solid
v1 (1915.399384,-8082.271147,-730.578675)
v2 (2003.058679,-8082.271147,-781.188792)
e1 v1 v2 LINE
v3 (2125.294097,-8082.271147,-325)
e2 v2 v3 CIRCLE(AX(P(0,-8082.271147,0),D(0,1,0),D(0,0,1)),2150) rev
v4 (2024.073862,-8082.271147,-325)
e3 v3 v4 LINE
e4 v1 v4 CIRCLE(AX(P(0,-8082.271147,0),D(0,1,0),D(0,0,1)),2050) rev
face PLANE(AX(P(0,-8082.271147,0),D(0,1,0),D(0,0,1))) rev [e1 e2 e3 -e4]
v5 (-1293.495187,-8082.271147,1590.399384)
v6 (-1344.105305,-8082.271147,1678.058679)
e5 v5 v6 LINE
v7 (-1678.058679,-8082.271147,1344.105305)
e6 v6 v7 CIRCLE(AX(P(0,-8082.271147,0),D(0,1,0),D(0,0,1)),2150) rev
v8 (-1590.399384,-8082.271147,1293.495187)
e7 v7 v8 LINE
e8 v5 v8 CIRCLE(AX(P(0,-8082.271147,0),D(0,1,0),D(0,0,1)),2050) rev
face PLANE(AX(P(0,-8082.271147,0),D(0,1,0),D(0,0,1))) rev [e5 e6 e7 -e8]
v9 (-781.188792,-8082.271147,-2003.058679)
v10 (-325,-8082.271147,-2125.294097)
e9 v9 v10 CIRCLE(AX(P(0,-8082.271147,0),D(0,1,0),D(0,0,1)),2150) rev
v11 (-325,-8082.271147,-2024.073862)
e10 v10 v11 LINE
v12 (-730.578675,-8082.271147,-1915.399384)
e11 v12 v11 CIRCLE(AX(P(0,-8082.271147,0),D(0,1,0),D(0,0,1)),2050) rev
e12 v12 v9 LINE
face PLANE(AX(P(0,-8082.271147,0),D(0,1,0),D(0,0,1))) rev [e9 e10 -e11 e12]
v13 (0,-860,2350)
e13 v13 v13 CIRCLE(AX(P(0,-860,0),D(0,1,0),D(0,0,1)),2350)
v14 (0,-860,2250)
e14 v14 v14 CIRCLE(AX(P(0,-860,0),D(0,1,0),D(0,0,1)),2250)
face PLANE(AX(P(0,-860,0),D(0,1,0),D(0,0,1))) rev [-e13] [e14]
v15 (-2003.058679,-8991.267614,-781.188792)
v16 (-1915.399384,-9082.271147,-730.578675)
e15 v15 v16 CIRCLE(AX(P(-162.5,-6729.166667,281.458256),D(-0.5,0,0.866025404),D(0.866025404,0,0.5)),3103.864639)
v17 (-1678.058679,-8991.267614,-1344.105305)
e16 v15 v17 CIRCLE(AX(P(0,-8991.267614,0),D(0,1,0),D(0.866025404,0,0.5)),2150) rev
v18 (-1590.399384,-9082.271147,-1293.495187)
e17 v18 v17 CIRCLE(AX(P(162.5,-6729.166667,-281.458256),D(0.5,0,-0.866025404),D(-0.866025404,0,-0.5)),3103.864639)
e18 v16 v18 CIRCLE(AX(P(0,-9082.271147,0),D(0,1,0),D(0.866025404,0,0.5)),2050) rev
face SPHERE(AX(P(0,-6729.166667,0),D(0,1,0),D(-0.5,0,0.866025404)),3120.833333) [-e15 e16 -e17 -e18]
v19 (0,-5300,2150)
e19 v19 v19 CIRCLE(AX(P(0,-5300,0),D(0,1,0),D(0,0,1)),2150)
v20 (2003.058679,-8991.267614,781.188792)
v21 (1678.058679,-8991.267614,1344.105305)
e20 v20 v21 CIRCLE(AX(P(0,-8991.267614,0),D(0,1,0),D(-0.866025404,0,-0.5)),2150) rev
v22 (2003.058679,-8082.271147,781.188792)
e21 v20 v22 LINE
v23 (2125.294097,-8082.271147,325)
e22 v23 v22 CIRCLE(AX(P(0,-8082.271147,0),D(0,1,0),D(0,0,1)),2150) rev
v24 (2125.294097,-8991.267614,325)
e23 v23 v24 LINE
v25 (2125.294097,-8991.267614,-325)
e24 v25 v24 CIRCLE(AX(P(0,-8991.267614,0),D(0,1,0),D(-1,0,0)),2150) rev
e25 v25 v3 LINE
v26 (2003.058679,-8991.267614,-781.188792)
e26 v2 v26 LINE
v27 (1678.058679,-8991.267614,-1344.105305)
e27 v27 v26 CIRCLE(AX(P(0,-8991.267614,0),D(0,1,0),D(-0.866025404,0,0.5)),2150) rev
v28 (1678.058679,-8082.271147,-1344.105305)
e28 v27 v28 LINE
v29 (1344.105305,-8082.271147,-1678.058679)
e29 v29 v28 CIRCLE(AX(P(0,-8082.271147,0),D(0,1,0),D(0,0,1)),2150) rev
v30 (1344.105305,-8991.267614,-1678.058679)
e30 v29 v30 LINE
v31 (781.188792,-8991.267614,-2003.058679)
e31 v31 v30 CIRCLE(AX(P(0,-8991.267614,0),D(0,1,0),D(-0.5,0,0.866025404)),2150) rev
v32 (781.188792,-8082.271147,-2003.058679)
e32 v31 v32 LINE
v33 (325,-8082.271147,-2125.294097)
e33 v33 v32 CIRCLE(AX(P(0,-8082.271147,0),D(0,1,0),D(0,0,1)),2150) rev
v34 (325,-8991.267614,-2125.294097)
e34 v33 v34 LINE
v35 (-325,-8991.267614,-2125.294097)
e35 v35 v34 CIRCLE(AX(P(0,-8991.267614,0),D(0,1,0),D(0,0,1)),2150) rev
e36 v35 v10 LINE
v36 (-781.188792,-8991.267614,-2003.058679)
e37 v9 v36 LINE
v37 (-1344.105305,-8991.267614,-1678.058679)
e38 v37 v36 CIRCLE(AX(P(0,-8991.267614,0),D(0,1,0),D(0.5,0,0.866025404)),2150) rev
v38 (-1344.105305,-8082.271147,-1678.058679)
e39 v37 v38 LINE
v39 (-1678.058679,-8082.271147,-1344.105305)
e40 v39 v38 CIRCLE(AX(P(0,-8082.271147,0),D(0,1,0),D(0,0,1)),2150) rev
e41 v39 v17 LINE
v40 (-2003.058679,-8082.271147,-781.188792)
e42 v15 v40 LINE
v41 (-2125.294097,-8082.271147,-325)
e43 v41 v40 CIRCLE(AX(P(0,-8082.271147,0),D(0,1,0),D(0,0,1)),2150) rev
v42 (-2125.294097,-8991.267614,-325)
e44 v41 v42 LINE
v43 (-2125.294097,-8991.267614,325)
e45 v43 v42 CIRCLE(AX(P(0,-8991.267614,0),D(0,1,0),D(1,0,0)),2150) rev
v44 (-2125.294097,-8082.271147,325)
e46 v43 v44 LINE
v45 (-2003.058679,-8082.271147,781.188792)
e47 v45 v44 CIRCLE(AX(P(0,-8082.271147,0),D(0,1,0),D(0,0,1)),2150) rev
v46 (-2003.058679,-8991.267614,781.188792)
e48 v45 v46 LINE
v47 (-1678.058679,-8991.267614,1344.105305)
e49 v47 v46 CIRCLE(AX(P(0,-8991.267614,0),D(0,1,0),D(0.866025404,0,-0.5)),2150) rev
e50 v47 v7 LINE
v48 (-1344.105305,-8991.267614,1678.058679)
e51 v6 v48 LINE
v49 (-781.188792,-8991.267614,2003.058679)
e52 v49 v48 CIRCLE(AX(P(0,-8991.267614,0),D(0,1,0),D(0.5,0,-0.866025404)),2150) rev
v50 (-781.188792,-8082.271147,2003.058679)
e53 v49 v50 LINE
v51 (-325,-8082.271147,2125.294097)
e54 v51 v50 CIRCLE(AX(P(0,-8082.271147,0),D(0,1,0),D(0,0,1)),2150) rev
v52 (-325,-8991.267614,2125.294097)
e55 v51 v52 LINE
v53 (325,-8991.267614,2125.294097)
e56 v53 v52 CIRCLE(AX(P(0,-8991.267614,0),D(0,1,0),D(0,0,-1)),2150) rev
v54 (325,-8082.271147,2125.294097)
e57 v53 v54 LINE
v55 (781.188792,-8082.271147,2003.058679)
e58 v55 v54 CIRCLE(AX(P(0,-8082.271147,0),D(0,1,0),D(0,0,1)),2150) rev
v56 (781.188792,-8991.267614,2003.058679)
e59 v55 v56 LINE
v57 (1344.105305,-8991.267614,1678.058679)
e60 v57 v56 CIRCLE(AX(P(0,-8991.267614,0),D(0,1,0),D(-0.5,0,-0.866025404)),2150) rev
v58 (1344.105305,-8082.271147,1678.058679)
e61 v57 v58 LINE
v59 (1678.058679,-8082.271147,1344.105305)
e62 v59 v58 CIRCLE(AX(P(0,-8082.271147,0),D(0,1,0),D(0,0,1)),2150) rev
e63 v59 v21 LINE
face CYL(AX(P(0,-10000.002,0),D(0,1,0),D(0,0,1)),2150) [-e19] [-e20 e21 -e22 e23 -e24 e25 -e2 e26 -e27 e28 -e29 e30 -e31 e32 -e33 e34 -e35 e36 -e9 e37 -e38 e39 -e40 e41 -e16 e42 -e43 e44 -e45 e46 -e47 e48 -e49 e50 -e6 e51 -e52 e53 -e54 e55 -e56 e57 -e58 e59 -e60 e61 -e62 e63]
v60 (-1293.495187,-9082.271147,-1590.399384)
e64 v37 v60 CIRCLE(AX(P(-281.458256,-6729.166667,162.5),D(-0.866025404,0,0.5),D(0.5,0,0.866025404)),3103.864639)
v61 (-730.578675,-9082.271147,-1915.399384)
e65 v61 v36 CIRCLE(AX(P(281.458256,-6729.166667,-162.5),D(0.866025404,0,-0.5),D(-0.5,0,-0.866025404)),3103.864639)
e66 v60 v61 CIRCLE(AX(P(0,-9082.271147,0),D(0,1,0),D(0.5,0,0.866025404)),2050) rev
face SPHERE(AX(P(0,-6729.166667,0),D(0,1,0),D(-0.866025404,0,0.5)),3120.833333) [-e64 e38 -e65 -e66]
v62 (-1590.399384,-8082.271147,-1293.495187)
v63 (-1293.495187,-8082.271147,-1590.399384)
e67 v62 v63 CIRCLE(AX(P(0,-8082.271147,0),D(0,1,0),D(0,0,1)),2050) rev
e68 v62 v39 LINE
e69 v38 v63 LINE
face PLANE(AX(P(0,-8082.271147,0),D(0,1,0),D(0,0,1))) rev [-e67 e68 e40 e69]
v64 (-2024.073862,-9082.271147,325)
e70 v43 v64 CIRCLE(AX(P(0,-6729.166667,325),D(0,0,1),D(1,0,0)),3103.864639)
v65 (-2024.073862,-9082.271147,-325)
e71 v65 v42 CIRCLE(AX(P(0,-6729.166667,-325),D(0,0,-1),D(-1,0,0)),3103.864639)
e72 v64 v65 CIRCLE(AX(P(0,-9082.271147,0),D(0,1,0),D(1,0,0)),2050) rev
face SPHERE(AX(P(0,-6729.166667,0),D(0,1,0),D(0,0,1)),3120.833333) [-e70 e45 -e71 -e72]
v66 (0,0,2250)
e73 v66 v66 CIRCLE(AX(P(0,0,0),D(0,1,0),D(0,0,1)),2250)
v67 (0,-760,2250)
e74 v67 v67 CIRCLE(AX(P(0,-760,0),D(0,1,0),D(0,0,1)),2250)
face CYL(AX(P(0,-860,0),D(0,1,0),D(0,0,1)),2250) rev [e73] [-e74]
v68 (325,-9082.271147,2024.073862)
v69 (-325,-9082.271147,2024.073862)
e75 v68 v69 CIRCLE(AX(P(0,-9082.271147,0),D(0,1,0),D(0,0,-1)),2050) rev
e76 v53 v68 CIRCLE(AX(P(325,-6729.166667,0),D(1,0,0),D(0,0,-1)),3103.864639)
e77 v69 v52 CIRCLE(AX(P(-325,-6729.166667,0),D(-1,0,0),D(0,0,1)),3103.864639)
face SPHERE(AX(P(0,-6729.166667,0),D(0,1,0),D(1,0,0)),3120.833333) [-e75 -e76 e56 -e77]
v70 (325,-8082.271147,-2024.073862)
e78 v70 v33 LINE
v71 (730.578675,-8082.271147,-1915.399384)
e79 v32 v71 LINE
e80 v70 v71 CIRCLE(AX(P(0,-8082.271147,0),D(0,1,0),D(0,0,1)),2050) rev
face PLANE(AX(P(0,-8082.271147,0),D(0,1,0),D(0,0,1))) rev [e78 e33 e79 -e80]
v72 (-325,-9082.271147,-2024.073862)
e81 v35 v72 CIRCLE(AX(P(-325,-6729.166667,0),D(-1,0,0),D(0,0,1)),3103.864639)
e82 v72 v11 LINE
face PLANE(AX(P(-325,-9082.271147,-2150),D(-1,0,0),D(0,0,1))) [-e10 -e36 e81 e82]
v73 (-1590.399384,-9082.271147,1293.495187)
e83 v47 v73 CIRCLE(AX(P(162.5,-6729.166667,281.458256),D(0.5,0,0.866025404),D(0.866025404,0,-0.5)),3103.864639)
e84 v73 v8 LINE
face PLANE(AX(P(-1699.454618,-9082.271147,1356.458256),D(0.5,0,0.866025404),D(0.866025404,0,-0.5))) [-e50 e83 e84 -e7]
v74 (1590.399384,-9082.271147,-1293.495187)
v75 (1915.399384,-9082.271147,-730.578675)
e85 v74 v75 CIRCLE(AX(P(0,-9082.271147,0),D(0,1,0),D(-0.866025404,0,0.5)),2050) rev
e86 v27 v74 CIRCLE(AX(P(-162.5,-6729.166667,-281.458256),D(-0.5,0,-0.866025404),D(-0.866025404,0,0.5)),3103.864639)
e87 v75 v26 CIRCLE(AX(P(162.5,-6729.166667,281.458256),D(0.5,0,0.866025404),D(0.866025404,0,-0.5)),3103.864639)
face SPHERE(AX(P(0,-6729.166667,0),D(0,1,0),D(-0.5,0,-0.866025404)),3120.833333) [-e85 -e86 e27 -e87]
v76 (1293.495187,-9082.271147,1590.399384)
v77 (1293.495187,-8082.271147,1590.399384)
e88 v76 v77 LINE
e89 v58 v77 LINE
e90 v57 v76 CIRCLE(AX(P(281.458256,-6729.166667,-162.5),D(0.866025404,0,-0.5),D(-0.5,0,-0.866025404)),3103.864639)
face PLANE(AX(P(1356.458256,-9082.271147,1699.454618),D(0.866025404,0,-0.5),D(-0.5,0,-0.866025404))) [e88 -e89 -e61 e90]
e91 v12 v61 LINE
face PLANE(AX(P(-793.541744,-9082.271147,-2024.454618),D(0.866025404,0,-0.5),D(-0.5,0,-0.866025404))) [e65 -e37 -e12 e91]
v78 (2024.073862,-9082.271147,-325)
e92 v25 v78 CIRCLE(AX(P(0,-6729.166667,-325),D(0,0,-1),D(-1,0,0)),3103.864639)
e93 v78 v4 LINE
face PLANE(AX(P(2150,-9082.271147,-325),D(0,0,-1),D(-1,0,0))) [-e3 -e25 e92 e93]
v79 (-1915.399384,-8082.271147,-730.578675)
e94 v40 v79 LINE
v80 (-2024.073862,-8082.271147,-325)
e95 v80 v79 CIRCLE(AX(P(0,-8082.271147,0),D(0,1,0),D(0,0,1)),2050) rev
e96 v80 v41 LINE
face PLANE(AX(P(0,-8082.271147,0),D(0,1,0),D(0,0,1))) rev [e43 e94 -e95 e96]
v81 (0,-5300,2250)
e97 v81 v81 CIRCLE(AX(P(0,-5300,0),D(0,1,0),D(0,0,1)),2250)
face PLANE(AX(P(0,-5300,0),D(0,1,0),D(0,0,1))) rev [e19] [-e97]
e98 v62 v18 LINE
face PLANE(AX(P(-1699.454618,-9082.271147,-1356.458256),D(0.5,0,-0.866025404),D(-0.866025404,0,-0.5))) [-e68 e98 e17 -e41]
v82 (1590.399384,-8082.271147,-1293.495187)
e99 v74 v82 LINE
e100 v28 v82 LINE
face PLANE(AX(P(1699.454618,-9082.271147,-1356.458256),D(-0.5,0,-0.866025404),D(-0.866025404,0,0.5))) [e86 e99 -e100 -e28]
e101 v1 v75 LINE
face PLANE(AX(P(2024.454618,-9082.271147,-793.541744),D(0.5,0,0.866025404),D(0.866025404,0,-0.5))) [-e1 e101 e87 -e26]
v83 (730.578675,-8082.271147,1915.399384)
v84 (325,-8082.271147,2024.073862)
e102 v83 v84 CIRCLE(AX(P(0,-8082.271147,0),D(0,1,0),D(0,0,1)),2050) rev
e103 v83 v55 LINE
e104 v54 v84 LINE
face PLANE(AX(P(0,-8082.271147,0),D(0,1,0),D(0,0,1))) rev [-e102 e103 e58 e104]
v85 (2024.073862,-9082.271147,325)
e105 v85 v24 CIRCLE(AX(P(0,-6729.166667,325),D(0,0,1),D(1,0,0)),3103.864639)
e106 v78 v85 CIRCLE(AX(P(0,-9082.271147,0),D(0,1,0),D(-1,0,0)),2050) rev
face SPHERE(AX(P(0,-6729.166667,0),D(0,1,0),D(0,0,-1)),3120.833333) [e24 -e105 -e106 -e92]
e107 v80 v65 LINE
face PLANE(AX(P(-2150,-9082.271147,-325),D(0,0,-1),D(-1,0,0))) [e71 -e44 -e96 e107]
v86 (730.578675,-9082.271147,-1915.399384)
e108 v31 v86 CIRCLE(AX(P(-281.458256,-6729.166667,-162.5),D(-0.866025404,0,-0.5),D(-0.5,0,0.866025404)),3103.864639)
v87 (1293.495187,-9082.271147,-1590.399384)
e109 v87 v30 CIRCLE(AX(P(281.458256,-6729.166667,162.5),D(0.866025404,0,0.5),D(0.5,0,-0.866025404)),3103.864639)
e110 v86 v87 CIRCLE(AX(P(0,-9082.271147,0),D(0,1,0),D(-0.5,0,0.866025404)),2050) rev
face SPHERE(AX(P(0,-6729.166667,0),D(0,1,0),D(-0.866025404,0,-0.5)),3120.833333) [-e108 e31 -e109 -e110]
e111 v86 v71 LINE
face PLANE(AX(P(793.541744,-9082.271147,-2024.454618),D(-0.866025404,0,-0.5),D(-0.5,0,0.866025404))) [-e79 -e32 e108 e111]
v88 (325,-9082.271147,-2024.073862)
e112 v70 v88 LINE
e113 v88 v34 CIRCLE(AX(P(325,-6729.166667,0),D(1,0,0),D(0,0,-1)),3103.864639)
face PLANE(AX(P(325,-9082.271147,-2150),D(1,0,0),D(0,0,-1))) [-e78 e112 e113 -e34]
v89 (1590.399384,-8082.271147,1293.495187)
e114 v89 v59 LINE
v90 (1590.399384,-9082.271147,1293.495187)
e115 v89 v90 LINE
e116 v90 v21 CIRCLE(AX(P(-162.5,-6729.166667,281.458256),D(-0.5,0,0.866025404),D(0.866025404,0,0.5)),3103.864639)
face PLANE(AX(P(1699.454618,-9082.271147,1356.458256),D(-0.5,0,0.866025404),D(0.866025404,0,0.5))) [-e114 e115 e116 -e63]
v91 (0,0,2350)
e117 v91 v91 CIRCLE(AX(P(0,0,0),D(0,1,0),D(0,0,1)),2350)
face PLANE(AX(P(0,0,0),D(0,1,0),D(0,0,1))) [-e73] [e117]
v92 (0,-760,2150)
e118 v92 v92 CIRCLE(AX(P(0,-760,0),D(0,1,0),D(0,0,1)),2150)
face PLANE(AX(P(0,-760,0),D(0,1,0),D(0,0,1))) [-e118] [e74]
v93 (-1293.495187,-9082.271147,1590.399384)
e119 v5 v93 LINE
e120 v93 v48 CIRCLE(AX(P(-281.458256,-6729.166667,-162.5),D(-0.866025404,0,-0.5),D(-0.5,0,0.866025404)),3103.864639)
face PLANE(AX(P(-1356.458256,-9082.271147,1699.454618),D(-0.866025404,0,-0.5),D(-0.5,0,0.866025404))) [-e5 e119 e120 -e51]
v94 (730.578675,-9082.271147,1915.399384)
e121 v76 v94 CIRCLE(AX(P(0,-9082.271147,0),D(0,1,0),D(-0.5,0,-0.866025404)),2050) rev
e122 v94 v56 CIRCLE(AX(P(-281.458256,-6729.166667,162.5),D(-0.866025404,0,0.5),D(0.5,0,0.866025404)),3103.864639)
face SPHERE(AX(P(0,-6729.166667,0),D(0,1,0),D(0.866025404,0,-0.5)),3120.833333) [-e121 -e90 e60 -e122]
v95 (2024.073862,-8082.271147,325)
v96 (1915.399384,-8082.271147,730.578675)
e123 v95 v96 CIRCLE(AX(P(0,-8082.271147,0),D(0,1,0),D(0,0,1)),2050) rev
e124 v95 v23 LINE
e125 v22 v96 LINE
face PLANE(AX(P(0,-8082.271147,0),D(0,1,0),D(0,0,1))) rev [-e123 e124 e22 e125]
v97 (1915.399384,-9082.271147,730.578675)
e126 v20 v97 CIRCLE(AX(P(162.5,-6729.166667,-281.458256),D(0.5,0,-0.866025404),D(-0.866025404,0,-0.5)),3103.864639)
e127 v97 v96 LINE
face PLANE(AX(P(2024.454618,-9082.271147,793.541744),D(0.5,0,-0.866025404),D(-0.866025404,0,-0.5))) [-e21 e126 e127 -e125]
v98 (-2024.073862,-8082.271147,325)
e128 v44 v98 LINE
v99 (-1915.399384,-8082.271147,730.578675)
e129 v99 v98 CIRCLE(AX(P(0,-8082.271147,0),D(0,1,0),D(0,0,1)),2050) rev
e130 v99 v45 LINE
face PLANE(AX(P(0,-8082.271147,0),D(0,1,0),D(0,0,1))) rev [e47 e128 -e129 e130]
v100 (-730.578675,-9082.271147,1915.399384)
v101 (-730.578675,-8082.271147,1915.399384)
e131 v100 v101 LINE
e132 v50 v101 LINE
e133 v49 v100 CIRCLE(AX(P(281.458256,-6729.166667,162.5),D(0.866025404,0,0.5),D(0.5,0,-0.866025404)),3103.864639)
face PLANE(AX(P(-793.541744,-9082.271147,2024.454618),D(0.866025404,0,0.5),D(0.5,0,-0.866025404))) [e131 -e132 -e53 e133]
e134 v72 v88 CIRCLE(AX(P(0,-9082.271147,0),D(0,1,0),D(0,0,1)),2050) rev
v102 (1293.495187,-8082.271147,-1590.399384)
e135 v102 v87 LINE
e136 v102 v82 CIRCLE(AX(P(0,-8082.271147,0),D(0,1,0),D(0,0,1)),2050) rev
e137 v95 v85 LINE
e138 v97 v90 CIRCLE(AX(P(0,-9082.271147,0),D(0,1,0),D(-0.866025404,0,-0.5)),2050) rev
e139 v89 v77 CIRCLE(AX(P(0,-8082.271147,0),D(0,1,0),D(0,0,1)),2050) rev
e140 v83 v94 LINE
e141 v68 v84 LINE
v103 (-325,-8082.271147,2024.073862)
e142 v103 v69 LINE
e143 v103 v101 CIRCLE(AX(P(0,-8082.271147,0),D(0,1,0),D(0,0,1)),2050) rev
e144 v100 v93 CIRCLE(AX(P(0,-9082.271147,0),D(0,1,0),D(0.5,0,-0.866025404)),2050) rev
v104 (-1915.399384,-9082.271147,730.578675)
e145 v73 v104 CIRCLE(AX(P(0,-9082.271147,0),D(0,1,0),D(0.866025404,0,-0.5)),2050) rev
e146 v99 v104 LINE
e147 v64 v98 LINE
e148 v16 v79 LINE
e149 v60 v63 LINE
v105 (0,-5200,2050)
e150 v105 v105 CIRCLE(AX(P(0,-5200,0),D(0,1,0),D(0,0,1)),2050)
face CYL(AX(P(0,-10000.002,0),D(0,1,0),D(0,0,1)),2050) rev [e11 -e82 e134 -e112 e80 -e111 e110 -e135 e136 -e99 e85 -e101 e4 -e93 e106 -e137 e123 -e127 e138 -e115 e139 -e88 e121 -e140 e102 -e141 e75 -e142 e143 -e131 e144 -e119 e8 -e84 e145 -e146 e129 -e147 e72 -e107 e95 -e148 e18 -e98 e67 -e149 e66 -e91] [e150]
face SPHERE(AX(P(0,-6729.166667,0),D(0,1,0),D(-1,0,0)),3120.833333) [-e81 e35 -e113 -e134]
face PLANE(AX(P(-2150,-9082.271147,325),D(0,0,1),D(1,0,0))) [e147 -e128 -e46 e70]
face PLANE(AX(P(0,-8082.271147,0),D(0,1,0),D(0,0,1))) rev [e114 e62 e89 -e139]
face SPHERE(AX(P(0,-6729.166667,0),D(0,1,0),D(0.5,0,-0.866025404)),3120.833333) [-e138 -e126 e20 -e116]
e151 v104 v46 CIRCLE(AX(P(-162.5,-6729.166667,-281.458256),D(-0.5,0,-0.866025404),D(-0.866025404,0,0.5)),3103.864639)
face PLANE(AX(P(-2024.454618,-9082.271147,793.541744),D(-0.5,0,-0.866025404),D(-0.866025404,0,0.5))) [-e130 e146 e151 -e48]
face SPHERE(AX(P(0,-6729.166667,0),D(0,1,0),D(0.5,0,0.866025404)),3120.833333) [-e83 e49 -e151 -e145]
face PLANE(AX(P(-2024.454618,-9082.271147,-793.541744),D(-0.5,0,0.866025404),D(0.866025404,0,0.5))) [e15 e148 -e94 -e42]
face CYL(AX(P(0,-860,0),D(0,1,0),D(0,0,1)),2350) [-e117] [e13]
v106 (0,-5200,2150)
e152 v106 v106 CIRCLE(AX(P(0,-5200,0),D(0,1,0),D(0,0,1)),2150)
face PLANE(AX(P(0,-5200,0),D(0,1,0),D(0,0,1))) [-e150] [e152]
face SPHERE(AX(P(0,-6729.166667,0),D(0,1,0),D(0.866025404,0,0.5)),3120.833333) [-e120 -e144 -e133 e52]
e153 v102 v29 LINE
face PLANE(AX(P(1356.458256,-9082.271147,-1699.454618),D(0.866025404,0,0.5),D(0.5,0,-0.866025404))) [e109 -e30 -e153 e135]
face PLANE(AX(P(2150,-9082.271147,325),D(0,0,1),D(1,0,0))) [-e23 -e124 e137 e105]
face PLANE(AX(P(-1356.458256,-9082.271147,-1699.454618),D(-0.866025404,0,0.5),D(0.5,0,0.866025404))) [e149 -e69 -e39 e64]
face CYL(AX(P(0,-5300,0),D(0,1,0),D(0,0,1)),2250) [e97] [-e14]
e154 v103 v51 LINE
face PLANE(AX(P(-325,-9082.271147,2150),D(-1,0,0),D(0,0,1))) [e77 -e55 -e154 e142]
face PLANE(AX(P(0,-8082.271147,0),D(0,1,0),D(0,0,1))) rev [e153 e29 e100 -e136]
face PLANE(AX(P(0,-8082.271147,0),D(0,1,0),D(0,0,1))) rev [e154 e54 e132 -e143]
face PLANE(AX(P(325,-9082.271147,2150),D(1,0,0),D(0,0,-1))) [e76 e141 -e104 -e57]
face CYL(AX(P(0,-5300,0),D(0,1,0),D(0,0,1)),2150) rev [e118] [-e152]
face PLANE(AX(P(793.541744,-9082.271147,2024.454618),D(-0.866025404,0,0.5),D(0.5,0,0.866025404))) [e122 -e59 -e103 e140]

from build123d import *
from build123d.topology import SkipClean

# Parameters (mm, degrees)
REVOLVE_1_ANGLE          = 180
SHELL_1_T                = -150
CUT_EXTRUDE_1_DEPTH      = 18660.782956937
EXTRUDE_1_REACH          = 14147.141
EXTRUDE_1_END_RADIUS     = 3120.833333333
SKETCH_3_R               = 2150
SKETCH_3_R_2             = 2050
SKETCH_4_R               = 3482.688790768
SKETCH_4_W               = 650
SKETCH_4_H               = 200
CUT_EXTRUDE_2_DEPTH      = 4190.568828001
PATTERN_CIRCULAR_2_COUNT = 12
EXTRUDE_2_DEPTH          = 4440
EXTRUDE_2_DEPTH_BACK     = 100
SKETCH_5_R               = 2250
SKETCH_5_R_2             = 2150
EXTRUDE_3_DEPTH          = 760
EXTRUDE_3_DEPTH_BACK     = 100
SKETCH_6_R               = 2350
SKETCH_6_R_2             = 2250


# Read off the part's stored shape, not the designer's step: 交差2
with BuildPart() as part:
    # ｽｹｯﾁ1 → 回転1 (revolve)
    with BuildSketch(Plane.XY):
        with BuildLine():
            Line((2750, 8400), (2750, -8500))
            ThreePointArc((2750, -8500), (1566.245510768, -9600.616769741), (0, -10000))
            Line((0, -10000), (0, 8400))
            Line((0, 8400), (2750, 8400))
        make_face()
    revolve(axis=Axis((0, 8400, 0), (0, -1, 0)), revolution_arc=REVOLVE_1_ANGLE)

    # ｼｪﾙ1
    shell_1_openings = [part.faces().sort_by_distance(p)[0] for p in [
        (0, -583.603631578, 0),
    ]]
    offset(amount=SHELL_1_T, openings=shell_1_openings)

    # ｽｹｯﾁ2 → ｶｯﾄ - 押し出し1 (cut, through all)
    with BuildSketch(Plane.XZ.offset(-8250)):
        with BuildLine():
            Line((-2600, 0), (2600, 0))
            ThreePointArc((2600, 0), (0, 2600), (-2600, 0))
        make_face()
    extrude(amount=-CUT_EXTRUDE_1_DEPTH, mode=Mode.SUBTRACT)

    # ﾐﾗｰ1: part across plane


with BuildPart() as part_1:
    with SkipClean():  # the faces are left unmerged after this step: merging them gives an invalid solid
        add(part.part)
        add(part.part.mirror(Plane.XY))


with BuildPart() as body_2:
    # ﾎﾞｽ - 押し出し1: up to this sphere (the profile starts inside it)
    extrude_1_end = Location((0, -6729.166666667, 0)) * Sphere(EXTRUDE_1_END_RADIUS, mode=Mode.PRIVATE)
    # ｽｹｯﾁ3 → ﾎﾞｽ - 押し出し1 (new, up to the surface)
    with BuildSketch(Plane(origin=(0, -5200, 0), x_dir=(1, 0, 0), z_dir=(0, 1, 0)), mode=Mode.PRIVATE) as extrude_1_sk1:
        with Locations(Location((0, 0, 0), (0, 0, 270))):
            Circle(SKETCH_3_R)
        with Locations(Location((0, 0, 0), (0, 0, 270))):
            Circle(SKETCH_3_R_2, mode=Mode.SUBTRACT)
    extrude_1_tool1 = extrude(extrude_1_sk1.sketch, amount=-EXTRUDE_1_REACH, mode=Mode.PRIVATE) & extrude_1_end
    add(extrude_1_tool1.solids().sort_by_distance((0, -5200, -2089.188817))[0])


with BuildPart() as body_2_2:
    # 交差2: the piece on the far side of the plane
    add(body_2.part)
    split(bisect_by=Plane(origin=(0, -8082.271146804, 0), x_dir=(1, 0, 0), z_dir=(0, 1, 0)), keep=Keep.BOTTOM)

    # ｽｹｯﾁ4 → ｶｯﾄ - 押し出し2 (cut, through all)
    with BuildSketch(Plane(origin=(0, -8082.271146804, 0), x_dir=(1, 0, 0), z_dir=(0, 1, 0))):
        Circle(SKETCH_4_R)
        with Locations((0, 2050)):
            Rectangle(SKETCH_4_W, SKETCH_4_H, mode=Mode.SUBTRACT)
    extrude(amount=-CUT_EXTRUDE_2_DEPTH, mode=Mode.SUBTRACT)


with BuildPart() as body_2_1:
    add(body_2.part)

    # 交差2
    split(bisect_by=Plane(origin=(0, -8082.271146804, 0), x_dir=(1, 0, 0), z_dir=(0, 1, 0)), keep=Keep.TOP)


with BuildPart() as pattern_circular_2_1:
    # 円形ﾊﾟﾀｰﾝ2: pattern copy
    add(body_2_2.part.rotate(Axis((0, 0, 0), (0, 1, 0)), 1 * 360 / PATTERN_CIRCULAR_2_COUNT))


with BuildPart() as pattern_circular_2_2:
    # 円形ﾊﾟﾀｰﾝ2: pattern copy
    add(body_2_2.part.rotate(Axis((0, 0, 0), (0, 1, 0)), 2 * 360 / PATTERN_CIRCULAR_2_COUNT))


with BuildPart() as pattern_circular_2_3:
    # 円形ﾊﾟﾀｰﾝ2: pattern copy
    add(body_2_2.part.rotate(Axis((0, 0, 0), (0, 1, 0)), 3 * 360 / PATTERN_CIRCULAR_2_COUNT))


with BuildPart() as pattern_circular_2_4:
    # 円形ﾊﾟﾀｰﾝ2: pattern copy
    add(body_2_2.part.rotate(Axis((0, 0, 0), (0, 1, 0)), 4 * 360 / PATTERN_CIRCULAR_2_COUNT))


with BuildPart() as pattern_circular_2_5:
    # 円形ﾊﾟﾀｰﾝ2: pattern copy
    add(body_2_2.part.rotate(Axis((0, 0, 0), (0, 1, 0)), 5 * 360 / PATTERN_CIRCULAR_2_COUNT))


with BuildPart() as pattern_circular_2_6:
    # 円形ﾊﾟﾀｰﾝ2: pattern copy
    add(body_2_2.part.rotate(Axis((0, 0, 0), (0, 1, 0)), 6 * 360 / PATTERN_CIRCULAR_2_COUNT))


with BuildPart() as pattern_circular_2_7:
    # 円形ﾊﾟﾀｰﾝ2: pattern copy
    add(body_2_2.part.rotate(Axis((0, 0, 0), (0, 1, 0)), 7 * 360 / PATTERN_CIRCULAR_2_COUNT))


with BuildPart() as pattern_circular_2_8:
    # 円形ﾊﾟﾀｰﾝ2: pattern copy
    add(body_2_2.part.rotate(Axis((0, 0, 0), (0, 1, 0)), 8 * 360 / PATTERN_CIRCULAR_2_COUNT))


with BuildPart() as pattern_circular_2_9:
    # 円形ﾊﾟﾀｰﾝ2: pattern copy
    add(body_2_2.part.rotate(Axis((0, 0, 0), (0, 1, 0)), 9 * 360 / PATTERN_CIRCULAR_2_COUNT))


with BuildPart() as pattern_circular_2_10:
    # 円形ﾊﾟﾀｰﾝ2: pattern copy
    add(body_2_2.part.rotate(Axis((0, 0, 0), (0, 1, 0)), 10 * 360 / PATTERN_CIRCULAR_2_COUNT))


with BuildPart() as pattern_circular_2_11:
    # 円形ﾊﾟﾀｰﾝ2: pattern copy
    add(body_2_2.part.rotate(Axis((0, 0, 0), (0, 1, 0)), 11 * 360 / PATTERN_CIRCULAR_2_COUNT))


with BuildPart() as body_2_2_1:
    add(body_2_2.part)

    # Combine 2: union 円形ﾊﾟﾀｰﾝ2_11, 円形ﾊﾟﾀｰﾝ2_10, 円形ﾊﾟﾀｰﾝ2_9, 円形ﾊﾟﾀｰﾝ2_8, 円形ﾊﾟﾀｰﾝ2_7, 円形ﾊﾟﾀｰﾝ2_6, 円形ﾊﾟﾀｰﾝ2_5, 円形ﾊﾟﾀｰﾝ2_4, 円形ﾊﾟﾀｰﾝ2_3, 円形ﾊﾟﾀｰﾝ2_2, 円形ﾊﾟﾀｰﾝ2_1, body 2
    add(pattern_circular_2_11.part)
    add(pattern_circular_2_10.part)
    add(pattern_circular_2_9.part)
    add(pattern_circular_2_8.part)
    add(pattern_circular_2_7.part)
    add(pattern_circular_2_6.part)
    add(pattern_circular_2_5.part)
    add(pattern_circular_2_4.part)
    add(pattern_circular_2_3.part)
    add(pattern_circular_2_2.part)
    add(pattern_circular_2_1.part)
    add(body_2_1.part)

    # ｽｹｯﾁ5 → ﾎﾞｽ - 押し出し2 (add, two sides: drawn at the far end of the back side and taken through both)
    with BuildSketch(Plane(origin=(0, -5200, 0), x_dir=(1, 0, 0), z_dir=(0, 1, 0)).offset(-EXTRUDE_2_DEPTH_BACK)):
        with Locations(Location((0, 0, 0), (0, 0, 270))):
            Circle(SKETCH_5_R)
        with Locations(Location((0, 0, 0), (0, 0, 270))):
            Circle(SKETCH_5_R_2, mode=Mode.SUBTRACT)
    extrude(amount=EXTRUDE_2_DEPTH + EXTRUDE_2_DEPTH_BACK)

    # ｽｹｯﾁ6 → ﾎﾞｽ - 押し出し3 (add, two sides: drawn at the far end of the back side and taken through both)
    with BuildSketch(Plane(origin=(0, -760, 0), x_dir=(1, 0, 0), z_dir=(0, 1, 0)).offset(-EXTRUDE_3_DEPTH_BACK)):
        with Locations(Location((0, 0, 0), (0, 0, 270))):
            Circle(SKETCH_6_R)
        with Locations(Location((0, 0, 0), (0, 0, 270))):
            Circle(SKETCH_6_R_2, mode=Mode.SUBTRACT)
    extrude(amount=EXTRUDE_3_DEPTH + EXTRUDE_3_DEPTH_BACK)


solid = body_2_2_1.part
